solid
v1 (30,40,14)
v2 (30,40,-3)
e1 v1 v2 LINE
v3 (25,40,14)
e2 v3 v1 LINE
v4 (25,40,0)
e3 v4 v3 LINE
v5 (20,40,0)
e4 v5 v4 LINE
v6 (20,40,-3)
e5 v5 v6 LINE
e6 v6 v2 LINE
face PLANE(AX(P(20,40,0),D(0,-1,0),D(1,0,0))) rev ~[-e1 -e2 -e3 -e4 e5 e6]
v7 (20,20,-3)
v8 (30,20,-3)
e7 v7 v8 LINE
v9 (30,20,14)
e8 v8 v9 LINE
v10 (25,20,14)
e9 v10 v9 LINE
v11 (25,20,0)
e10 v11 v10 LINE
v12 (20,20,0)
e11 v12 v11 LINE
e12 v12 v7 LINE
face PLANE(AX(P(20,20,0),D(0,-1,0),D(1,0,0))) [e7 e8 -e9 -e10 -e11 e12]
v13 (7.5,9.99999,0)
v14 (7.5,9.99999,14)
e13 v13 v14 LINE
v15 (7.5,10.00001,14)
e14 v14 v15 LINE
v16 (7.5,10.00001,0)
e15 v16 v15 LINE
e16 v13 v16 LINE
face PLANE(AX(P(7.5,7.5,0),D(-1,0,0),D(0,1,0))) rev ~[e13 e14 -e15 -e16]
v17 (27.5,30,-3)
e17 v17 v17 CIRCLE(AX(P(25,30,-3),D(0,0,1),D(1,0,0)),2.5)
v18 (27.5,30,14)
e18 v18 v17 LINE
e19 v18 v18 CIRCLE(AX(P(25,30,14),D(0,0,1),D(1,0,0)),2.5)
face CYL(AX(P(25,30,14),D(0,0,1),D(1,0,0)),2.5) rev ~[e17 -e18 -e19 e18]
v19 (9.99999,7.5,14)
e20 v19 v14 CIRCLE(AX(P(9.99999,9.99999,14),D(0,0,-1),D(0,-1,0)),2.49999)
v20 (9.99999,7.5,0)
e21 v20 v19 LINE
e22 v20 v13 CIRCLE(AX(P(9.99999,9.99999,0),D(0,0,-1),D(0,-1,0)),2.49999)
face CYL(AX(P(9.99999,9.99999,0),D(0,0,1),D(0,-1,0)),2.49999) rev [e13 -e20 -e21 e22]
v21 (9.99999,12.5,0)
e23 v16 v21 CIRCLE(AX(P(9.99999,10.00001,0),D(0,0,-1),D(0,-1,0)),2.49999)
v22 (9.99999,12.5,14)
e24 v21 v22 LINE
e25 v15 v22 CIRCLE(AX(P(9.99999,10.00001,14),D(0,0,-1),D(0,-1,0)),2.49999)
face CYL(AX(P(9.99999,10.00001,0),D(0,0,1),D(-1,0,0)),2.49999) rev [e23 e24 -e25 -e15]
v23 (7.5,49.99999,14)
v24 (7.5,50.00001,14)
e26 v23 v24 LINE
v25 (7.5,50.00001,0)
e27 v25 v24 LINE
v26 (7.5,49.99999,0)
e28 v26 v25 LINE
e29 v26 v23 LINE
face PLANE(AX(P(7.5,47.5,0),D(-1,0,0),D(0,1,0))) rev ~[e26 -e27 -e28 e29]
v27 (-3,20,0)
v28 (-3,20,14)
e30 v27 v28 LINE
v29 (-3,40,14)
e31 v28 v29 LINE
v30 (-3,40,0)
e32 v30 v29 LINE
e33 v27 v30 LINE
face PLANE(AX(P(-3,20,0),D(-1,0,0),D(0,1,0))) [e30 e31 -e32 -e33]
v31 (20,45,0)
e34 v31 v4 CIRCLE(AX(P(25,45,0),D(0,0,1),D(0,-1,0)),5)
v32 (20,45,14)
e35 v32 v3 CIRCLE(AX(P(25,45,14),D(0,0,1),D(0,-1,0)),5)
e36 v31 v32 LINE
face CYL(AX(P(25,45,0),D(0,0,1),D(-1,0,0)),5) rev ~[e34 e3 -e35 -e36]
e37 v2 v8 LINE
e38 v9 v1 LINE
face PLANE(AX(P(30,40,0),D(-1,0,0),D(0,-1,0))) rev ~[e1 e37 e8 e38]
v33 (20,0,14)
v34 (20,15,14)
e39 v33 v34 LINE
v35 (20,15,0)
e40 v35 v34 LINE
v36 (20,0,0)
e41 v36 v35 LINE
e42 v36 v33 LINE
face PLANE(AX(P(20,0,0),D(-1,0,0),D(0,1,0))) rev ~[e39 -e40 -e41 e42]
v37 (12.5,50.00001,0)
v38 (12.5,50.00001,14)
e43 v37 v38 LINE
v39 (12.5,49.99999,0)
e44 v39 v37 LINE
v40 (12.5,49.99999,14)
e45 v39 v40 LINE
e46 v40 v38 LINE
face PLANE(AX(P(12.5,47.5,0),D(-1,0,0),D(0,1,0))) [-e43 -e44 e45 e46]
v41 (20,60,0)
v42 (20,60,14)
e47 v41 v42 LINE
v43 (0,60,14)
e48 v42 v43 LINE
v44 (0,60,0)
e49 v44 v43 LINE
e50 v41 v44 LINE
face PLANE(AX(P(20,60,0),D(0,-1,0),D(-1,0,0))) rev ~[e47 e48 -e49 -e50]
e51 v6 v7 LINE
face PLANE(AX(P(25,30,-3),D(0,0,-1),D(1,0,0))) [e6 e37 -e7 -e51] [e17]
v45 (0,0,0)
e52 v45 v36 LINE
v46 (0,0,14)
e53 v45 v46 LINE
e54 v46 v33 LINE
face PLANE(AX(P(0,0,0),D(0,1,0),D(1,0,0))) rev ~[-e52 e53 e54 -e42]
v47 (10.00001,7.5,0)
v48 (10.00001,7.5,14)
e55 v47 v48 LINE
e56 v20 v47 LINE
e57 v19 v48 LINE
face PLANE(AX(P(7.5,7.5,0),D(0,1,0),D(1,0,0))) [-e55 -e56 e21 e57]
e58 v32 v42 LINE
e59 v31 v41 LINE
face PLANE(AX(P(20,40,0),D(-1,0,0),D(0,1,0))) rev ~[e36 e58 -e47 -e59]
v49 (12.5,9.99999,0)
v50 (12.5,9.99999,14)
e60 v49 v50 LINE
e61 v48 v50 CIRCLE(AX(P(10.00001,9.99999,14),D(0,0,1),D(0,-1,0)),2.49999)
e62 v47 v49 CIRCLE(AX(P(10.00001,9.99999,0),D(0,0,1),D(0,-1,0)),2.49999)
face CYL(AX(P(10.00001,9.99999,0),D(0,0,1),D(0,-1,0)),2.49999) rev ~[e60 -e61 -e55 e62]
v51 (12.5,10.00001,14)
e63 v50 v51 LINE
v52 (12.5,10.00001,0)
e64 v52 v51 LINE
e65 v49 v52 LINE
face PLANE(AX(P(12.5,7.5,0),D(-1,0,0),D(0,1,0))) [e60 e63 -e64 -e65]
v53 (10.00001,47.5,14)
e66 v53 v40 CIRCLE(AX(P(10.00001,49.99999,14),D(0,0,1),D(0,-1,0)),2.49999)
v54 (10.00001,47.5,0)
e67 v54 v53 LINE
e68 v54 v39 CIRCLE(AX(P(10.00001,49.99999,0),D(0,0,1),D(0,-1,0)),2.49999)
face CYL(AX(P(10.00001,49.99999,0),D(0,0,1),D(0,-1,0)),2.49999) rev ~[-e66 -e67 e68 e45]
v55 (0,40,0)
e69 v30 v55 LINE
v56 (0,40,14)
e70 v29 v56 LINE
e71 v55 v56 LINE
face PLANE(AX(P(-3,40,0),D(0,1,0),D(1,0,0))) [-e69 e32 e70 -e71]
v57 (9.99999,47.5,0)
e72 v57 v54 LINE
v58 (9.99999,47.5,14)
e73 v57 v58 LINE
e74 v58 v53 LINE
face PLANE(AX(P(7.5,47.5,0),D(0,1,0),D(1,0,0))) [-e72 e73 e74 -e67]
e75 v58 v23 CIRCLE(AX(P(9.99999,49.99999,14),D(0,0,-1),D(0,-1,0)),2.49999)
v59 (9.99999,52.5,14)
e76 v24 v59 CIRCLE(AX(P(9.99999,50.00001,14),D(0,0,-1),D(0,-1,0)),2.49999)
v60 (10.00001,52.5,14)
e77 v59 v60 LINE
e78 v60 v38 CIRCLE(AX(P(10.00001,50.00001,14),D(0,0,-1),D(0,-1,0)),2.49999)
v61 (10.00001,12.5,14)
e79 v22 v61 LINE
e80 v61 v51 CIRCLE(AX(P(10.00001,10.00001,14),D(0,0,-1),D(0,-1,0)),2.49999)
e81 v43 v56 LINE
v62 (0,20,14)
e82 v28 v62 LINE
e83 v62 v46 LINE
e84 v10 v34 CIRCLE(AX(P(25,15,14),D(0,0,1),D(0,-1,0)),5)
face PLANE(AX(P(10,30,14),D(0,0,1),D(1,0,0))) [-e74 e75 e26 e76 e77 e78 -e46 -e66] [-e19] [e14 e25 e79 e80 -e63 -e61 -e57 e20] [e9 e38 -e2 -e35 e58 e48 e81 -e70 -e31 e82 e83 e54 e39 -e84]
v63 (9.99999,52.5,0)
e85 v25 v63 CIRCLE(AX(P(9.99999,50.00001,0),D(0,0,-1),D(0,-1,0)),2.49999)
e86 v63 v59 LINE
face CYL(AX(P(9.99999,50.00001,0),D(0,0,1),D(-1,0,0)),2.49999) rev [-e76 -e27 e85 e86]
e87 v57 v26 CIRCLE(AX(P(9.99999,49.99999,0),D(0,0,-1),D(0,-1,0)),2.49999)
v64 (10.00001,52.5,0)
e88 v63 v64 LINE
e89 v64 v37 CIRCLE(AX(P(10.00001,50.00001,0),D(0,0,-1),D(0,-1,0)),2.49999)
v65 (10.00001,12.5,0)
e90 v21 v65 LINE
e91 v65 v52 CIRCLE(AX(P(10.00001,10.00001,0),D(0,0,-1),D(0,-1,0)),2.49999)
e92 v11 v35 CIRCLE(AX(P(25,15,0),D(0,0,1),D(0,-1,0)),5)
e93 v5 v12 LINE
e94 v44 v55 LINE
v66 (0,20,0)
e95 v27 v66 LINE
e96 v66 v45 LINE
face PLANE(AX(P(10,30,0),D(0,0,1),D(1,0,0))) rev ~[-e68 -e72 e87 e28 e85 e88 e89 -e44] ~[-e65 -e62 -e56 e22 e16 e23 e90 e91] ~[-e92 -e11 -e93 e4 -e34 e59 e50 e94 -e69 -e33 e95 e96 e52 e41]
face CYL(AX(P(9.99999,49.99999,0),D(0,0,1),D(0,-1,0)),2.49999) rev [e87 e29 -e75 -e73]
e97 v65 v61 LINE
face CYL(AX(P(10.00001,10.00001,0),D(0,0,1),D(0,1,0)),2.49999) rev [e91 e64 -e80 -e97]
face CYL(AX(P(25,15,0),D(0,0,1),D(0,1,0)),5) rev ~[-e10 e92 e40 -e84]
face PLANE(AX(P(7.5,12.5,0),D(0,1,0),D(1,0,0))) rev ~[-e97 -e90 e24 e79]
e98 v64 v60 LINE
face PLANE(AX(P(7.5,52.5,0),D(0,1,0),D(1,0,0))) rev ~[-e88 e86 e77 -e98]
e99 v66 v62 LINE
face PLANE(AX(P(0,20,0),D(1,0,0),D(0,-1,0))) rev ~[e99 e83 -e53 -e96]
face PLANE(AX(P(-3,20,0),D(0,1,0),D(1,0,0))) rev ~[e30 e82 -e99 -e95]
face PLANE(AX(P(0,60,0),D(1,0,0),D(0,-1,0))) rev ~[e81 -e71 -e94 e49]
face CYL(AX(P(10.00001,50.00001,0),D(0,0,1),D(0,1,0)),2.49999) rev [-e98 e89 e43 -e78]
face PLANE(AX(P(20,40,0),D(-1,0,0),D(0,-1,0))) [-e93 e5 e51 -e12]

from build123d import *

# Parameters (mm, degrees)
F0_W     = 5
F0_H     = 5
F0_W_2   = 3
F0_H_2   = 20
F0_W_3   = 10
F1_DEPTH = 14
F2_W     = 10
F2_H     = 20
F3_DEPTH = 3
F4_R     = 5
F5_R     = 5
F6_R     = 2.49999
F7_R     = 2.49999
F8_R     = 2.5
F9_DEPTH = 25


# Not quite as in the source:
# - a fillet or chamfer is up to 0.001 mm smaller than in the source, because OpenCascade refuses the exact size


with BuildPart() as f1:
    # F0 (on Top) → F1 (new body)
    with BuildSketch(Plane.XY):
        Polygon((0, 20), (0, 0), (20, 0), (20, 20), (20, 40), (20, 60), (0, 60), (0, 40), align=None)
        with Locations((10, 10)):
            Rectangle(F0_W, F0_H, mode=Mode.SUBTRACT)
        with Locations((10, 50)):
            Rectangle(F0_W, F0_H, mode=Mode.SUBTRACT)
        with Locations((-1.5, 30)):
            Rectangle(F0_W_2, F0_H_2)
        with Locations((25, 30)):
            Rectangle(F0_W_3, F0_H_2)
    extrude(amount=F1_DEPTH)

    # F2 (on face) → F3 (join)
    with BuildSketch(Plane(origin=(0, 0, 0), x_dir=(1, 0, 0), z_dir=(0, 0, -1))):
        with Locations((25, -30)):
            Rectangle(F2_W, F2_H)
    extrude(amount=F3_DEPTH)

    # F4
    f4_edges = [f1.edges().sort_by_distance(p)[0] for p in [
        (20, 40, 7),
    ]]
    fillet(f4_edges, radius=F4_R)

    # F5
    f5_edges = [f1.edges().sort_by_distance(p)[0] for p in [
        (20, 20, 7),
    ]]
    fillet(f5_edges, radius=F5_R)

    # F6 (radius 2.5 in the source; OpenCascade refuses exactly that, so slightly less here)
    f6_edges = [f1.edges().sort_by_distance(p)[0] for p in [
        (7.5, 7.5, 7),
        (7.5, 12.5, 7),
        (12.5, 12.5, 7),
        (12.5, 7.5, 7),
    ]]
    fillet(f6_edges, radius=F6_R)

    # F7 (radius 2.5 in the source; OpenCascade refuses exactly that, so slightly less here)
    f7_edges = [f1.edges().sort_by_distance(p)[0] for p in [
        (12.5, 47.5, 7),
        (7.5, 47.5, 7),
        (7.5, 52.5, 7),
        (12.5, 52.5, 7),
    ]]
    fillet(f7_edges, radius=F7_R)

    # F8 (on face) → F9 (cut)
    with BuildSketch(Plane.XY.offset(14)):
        with Locations((25, 30)):
            Circle(F8_R)
    extrude(amount=-F9_DEPTH, mode=Mode.SUBTRACT)


solid = f1.part
